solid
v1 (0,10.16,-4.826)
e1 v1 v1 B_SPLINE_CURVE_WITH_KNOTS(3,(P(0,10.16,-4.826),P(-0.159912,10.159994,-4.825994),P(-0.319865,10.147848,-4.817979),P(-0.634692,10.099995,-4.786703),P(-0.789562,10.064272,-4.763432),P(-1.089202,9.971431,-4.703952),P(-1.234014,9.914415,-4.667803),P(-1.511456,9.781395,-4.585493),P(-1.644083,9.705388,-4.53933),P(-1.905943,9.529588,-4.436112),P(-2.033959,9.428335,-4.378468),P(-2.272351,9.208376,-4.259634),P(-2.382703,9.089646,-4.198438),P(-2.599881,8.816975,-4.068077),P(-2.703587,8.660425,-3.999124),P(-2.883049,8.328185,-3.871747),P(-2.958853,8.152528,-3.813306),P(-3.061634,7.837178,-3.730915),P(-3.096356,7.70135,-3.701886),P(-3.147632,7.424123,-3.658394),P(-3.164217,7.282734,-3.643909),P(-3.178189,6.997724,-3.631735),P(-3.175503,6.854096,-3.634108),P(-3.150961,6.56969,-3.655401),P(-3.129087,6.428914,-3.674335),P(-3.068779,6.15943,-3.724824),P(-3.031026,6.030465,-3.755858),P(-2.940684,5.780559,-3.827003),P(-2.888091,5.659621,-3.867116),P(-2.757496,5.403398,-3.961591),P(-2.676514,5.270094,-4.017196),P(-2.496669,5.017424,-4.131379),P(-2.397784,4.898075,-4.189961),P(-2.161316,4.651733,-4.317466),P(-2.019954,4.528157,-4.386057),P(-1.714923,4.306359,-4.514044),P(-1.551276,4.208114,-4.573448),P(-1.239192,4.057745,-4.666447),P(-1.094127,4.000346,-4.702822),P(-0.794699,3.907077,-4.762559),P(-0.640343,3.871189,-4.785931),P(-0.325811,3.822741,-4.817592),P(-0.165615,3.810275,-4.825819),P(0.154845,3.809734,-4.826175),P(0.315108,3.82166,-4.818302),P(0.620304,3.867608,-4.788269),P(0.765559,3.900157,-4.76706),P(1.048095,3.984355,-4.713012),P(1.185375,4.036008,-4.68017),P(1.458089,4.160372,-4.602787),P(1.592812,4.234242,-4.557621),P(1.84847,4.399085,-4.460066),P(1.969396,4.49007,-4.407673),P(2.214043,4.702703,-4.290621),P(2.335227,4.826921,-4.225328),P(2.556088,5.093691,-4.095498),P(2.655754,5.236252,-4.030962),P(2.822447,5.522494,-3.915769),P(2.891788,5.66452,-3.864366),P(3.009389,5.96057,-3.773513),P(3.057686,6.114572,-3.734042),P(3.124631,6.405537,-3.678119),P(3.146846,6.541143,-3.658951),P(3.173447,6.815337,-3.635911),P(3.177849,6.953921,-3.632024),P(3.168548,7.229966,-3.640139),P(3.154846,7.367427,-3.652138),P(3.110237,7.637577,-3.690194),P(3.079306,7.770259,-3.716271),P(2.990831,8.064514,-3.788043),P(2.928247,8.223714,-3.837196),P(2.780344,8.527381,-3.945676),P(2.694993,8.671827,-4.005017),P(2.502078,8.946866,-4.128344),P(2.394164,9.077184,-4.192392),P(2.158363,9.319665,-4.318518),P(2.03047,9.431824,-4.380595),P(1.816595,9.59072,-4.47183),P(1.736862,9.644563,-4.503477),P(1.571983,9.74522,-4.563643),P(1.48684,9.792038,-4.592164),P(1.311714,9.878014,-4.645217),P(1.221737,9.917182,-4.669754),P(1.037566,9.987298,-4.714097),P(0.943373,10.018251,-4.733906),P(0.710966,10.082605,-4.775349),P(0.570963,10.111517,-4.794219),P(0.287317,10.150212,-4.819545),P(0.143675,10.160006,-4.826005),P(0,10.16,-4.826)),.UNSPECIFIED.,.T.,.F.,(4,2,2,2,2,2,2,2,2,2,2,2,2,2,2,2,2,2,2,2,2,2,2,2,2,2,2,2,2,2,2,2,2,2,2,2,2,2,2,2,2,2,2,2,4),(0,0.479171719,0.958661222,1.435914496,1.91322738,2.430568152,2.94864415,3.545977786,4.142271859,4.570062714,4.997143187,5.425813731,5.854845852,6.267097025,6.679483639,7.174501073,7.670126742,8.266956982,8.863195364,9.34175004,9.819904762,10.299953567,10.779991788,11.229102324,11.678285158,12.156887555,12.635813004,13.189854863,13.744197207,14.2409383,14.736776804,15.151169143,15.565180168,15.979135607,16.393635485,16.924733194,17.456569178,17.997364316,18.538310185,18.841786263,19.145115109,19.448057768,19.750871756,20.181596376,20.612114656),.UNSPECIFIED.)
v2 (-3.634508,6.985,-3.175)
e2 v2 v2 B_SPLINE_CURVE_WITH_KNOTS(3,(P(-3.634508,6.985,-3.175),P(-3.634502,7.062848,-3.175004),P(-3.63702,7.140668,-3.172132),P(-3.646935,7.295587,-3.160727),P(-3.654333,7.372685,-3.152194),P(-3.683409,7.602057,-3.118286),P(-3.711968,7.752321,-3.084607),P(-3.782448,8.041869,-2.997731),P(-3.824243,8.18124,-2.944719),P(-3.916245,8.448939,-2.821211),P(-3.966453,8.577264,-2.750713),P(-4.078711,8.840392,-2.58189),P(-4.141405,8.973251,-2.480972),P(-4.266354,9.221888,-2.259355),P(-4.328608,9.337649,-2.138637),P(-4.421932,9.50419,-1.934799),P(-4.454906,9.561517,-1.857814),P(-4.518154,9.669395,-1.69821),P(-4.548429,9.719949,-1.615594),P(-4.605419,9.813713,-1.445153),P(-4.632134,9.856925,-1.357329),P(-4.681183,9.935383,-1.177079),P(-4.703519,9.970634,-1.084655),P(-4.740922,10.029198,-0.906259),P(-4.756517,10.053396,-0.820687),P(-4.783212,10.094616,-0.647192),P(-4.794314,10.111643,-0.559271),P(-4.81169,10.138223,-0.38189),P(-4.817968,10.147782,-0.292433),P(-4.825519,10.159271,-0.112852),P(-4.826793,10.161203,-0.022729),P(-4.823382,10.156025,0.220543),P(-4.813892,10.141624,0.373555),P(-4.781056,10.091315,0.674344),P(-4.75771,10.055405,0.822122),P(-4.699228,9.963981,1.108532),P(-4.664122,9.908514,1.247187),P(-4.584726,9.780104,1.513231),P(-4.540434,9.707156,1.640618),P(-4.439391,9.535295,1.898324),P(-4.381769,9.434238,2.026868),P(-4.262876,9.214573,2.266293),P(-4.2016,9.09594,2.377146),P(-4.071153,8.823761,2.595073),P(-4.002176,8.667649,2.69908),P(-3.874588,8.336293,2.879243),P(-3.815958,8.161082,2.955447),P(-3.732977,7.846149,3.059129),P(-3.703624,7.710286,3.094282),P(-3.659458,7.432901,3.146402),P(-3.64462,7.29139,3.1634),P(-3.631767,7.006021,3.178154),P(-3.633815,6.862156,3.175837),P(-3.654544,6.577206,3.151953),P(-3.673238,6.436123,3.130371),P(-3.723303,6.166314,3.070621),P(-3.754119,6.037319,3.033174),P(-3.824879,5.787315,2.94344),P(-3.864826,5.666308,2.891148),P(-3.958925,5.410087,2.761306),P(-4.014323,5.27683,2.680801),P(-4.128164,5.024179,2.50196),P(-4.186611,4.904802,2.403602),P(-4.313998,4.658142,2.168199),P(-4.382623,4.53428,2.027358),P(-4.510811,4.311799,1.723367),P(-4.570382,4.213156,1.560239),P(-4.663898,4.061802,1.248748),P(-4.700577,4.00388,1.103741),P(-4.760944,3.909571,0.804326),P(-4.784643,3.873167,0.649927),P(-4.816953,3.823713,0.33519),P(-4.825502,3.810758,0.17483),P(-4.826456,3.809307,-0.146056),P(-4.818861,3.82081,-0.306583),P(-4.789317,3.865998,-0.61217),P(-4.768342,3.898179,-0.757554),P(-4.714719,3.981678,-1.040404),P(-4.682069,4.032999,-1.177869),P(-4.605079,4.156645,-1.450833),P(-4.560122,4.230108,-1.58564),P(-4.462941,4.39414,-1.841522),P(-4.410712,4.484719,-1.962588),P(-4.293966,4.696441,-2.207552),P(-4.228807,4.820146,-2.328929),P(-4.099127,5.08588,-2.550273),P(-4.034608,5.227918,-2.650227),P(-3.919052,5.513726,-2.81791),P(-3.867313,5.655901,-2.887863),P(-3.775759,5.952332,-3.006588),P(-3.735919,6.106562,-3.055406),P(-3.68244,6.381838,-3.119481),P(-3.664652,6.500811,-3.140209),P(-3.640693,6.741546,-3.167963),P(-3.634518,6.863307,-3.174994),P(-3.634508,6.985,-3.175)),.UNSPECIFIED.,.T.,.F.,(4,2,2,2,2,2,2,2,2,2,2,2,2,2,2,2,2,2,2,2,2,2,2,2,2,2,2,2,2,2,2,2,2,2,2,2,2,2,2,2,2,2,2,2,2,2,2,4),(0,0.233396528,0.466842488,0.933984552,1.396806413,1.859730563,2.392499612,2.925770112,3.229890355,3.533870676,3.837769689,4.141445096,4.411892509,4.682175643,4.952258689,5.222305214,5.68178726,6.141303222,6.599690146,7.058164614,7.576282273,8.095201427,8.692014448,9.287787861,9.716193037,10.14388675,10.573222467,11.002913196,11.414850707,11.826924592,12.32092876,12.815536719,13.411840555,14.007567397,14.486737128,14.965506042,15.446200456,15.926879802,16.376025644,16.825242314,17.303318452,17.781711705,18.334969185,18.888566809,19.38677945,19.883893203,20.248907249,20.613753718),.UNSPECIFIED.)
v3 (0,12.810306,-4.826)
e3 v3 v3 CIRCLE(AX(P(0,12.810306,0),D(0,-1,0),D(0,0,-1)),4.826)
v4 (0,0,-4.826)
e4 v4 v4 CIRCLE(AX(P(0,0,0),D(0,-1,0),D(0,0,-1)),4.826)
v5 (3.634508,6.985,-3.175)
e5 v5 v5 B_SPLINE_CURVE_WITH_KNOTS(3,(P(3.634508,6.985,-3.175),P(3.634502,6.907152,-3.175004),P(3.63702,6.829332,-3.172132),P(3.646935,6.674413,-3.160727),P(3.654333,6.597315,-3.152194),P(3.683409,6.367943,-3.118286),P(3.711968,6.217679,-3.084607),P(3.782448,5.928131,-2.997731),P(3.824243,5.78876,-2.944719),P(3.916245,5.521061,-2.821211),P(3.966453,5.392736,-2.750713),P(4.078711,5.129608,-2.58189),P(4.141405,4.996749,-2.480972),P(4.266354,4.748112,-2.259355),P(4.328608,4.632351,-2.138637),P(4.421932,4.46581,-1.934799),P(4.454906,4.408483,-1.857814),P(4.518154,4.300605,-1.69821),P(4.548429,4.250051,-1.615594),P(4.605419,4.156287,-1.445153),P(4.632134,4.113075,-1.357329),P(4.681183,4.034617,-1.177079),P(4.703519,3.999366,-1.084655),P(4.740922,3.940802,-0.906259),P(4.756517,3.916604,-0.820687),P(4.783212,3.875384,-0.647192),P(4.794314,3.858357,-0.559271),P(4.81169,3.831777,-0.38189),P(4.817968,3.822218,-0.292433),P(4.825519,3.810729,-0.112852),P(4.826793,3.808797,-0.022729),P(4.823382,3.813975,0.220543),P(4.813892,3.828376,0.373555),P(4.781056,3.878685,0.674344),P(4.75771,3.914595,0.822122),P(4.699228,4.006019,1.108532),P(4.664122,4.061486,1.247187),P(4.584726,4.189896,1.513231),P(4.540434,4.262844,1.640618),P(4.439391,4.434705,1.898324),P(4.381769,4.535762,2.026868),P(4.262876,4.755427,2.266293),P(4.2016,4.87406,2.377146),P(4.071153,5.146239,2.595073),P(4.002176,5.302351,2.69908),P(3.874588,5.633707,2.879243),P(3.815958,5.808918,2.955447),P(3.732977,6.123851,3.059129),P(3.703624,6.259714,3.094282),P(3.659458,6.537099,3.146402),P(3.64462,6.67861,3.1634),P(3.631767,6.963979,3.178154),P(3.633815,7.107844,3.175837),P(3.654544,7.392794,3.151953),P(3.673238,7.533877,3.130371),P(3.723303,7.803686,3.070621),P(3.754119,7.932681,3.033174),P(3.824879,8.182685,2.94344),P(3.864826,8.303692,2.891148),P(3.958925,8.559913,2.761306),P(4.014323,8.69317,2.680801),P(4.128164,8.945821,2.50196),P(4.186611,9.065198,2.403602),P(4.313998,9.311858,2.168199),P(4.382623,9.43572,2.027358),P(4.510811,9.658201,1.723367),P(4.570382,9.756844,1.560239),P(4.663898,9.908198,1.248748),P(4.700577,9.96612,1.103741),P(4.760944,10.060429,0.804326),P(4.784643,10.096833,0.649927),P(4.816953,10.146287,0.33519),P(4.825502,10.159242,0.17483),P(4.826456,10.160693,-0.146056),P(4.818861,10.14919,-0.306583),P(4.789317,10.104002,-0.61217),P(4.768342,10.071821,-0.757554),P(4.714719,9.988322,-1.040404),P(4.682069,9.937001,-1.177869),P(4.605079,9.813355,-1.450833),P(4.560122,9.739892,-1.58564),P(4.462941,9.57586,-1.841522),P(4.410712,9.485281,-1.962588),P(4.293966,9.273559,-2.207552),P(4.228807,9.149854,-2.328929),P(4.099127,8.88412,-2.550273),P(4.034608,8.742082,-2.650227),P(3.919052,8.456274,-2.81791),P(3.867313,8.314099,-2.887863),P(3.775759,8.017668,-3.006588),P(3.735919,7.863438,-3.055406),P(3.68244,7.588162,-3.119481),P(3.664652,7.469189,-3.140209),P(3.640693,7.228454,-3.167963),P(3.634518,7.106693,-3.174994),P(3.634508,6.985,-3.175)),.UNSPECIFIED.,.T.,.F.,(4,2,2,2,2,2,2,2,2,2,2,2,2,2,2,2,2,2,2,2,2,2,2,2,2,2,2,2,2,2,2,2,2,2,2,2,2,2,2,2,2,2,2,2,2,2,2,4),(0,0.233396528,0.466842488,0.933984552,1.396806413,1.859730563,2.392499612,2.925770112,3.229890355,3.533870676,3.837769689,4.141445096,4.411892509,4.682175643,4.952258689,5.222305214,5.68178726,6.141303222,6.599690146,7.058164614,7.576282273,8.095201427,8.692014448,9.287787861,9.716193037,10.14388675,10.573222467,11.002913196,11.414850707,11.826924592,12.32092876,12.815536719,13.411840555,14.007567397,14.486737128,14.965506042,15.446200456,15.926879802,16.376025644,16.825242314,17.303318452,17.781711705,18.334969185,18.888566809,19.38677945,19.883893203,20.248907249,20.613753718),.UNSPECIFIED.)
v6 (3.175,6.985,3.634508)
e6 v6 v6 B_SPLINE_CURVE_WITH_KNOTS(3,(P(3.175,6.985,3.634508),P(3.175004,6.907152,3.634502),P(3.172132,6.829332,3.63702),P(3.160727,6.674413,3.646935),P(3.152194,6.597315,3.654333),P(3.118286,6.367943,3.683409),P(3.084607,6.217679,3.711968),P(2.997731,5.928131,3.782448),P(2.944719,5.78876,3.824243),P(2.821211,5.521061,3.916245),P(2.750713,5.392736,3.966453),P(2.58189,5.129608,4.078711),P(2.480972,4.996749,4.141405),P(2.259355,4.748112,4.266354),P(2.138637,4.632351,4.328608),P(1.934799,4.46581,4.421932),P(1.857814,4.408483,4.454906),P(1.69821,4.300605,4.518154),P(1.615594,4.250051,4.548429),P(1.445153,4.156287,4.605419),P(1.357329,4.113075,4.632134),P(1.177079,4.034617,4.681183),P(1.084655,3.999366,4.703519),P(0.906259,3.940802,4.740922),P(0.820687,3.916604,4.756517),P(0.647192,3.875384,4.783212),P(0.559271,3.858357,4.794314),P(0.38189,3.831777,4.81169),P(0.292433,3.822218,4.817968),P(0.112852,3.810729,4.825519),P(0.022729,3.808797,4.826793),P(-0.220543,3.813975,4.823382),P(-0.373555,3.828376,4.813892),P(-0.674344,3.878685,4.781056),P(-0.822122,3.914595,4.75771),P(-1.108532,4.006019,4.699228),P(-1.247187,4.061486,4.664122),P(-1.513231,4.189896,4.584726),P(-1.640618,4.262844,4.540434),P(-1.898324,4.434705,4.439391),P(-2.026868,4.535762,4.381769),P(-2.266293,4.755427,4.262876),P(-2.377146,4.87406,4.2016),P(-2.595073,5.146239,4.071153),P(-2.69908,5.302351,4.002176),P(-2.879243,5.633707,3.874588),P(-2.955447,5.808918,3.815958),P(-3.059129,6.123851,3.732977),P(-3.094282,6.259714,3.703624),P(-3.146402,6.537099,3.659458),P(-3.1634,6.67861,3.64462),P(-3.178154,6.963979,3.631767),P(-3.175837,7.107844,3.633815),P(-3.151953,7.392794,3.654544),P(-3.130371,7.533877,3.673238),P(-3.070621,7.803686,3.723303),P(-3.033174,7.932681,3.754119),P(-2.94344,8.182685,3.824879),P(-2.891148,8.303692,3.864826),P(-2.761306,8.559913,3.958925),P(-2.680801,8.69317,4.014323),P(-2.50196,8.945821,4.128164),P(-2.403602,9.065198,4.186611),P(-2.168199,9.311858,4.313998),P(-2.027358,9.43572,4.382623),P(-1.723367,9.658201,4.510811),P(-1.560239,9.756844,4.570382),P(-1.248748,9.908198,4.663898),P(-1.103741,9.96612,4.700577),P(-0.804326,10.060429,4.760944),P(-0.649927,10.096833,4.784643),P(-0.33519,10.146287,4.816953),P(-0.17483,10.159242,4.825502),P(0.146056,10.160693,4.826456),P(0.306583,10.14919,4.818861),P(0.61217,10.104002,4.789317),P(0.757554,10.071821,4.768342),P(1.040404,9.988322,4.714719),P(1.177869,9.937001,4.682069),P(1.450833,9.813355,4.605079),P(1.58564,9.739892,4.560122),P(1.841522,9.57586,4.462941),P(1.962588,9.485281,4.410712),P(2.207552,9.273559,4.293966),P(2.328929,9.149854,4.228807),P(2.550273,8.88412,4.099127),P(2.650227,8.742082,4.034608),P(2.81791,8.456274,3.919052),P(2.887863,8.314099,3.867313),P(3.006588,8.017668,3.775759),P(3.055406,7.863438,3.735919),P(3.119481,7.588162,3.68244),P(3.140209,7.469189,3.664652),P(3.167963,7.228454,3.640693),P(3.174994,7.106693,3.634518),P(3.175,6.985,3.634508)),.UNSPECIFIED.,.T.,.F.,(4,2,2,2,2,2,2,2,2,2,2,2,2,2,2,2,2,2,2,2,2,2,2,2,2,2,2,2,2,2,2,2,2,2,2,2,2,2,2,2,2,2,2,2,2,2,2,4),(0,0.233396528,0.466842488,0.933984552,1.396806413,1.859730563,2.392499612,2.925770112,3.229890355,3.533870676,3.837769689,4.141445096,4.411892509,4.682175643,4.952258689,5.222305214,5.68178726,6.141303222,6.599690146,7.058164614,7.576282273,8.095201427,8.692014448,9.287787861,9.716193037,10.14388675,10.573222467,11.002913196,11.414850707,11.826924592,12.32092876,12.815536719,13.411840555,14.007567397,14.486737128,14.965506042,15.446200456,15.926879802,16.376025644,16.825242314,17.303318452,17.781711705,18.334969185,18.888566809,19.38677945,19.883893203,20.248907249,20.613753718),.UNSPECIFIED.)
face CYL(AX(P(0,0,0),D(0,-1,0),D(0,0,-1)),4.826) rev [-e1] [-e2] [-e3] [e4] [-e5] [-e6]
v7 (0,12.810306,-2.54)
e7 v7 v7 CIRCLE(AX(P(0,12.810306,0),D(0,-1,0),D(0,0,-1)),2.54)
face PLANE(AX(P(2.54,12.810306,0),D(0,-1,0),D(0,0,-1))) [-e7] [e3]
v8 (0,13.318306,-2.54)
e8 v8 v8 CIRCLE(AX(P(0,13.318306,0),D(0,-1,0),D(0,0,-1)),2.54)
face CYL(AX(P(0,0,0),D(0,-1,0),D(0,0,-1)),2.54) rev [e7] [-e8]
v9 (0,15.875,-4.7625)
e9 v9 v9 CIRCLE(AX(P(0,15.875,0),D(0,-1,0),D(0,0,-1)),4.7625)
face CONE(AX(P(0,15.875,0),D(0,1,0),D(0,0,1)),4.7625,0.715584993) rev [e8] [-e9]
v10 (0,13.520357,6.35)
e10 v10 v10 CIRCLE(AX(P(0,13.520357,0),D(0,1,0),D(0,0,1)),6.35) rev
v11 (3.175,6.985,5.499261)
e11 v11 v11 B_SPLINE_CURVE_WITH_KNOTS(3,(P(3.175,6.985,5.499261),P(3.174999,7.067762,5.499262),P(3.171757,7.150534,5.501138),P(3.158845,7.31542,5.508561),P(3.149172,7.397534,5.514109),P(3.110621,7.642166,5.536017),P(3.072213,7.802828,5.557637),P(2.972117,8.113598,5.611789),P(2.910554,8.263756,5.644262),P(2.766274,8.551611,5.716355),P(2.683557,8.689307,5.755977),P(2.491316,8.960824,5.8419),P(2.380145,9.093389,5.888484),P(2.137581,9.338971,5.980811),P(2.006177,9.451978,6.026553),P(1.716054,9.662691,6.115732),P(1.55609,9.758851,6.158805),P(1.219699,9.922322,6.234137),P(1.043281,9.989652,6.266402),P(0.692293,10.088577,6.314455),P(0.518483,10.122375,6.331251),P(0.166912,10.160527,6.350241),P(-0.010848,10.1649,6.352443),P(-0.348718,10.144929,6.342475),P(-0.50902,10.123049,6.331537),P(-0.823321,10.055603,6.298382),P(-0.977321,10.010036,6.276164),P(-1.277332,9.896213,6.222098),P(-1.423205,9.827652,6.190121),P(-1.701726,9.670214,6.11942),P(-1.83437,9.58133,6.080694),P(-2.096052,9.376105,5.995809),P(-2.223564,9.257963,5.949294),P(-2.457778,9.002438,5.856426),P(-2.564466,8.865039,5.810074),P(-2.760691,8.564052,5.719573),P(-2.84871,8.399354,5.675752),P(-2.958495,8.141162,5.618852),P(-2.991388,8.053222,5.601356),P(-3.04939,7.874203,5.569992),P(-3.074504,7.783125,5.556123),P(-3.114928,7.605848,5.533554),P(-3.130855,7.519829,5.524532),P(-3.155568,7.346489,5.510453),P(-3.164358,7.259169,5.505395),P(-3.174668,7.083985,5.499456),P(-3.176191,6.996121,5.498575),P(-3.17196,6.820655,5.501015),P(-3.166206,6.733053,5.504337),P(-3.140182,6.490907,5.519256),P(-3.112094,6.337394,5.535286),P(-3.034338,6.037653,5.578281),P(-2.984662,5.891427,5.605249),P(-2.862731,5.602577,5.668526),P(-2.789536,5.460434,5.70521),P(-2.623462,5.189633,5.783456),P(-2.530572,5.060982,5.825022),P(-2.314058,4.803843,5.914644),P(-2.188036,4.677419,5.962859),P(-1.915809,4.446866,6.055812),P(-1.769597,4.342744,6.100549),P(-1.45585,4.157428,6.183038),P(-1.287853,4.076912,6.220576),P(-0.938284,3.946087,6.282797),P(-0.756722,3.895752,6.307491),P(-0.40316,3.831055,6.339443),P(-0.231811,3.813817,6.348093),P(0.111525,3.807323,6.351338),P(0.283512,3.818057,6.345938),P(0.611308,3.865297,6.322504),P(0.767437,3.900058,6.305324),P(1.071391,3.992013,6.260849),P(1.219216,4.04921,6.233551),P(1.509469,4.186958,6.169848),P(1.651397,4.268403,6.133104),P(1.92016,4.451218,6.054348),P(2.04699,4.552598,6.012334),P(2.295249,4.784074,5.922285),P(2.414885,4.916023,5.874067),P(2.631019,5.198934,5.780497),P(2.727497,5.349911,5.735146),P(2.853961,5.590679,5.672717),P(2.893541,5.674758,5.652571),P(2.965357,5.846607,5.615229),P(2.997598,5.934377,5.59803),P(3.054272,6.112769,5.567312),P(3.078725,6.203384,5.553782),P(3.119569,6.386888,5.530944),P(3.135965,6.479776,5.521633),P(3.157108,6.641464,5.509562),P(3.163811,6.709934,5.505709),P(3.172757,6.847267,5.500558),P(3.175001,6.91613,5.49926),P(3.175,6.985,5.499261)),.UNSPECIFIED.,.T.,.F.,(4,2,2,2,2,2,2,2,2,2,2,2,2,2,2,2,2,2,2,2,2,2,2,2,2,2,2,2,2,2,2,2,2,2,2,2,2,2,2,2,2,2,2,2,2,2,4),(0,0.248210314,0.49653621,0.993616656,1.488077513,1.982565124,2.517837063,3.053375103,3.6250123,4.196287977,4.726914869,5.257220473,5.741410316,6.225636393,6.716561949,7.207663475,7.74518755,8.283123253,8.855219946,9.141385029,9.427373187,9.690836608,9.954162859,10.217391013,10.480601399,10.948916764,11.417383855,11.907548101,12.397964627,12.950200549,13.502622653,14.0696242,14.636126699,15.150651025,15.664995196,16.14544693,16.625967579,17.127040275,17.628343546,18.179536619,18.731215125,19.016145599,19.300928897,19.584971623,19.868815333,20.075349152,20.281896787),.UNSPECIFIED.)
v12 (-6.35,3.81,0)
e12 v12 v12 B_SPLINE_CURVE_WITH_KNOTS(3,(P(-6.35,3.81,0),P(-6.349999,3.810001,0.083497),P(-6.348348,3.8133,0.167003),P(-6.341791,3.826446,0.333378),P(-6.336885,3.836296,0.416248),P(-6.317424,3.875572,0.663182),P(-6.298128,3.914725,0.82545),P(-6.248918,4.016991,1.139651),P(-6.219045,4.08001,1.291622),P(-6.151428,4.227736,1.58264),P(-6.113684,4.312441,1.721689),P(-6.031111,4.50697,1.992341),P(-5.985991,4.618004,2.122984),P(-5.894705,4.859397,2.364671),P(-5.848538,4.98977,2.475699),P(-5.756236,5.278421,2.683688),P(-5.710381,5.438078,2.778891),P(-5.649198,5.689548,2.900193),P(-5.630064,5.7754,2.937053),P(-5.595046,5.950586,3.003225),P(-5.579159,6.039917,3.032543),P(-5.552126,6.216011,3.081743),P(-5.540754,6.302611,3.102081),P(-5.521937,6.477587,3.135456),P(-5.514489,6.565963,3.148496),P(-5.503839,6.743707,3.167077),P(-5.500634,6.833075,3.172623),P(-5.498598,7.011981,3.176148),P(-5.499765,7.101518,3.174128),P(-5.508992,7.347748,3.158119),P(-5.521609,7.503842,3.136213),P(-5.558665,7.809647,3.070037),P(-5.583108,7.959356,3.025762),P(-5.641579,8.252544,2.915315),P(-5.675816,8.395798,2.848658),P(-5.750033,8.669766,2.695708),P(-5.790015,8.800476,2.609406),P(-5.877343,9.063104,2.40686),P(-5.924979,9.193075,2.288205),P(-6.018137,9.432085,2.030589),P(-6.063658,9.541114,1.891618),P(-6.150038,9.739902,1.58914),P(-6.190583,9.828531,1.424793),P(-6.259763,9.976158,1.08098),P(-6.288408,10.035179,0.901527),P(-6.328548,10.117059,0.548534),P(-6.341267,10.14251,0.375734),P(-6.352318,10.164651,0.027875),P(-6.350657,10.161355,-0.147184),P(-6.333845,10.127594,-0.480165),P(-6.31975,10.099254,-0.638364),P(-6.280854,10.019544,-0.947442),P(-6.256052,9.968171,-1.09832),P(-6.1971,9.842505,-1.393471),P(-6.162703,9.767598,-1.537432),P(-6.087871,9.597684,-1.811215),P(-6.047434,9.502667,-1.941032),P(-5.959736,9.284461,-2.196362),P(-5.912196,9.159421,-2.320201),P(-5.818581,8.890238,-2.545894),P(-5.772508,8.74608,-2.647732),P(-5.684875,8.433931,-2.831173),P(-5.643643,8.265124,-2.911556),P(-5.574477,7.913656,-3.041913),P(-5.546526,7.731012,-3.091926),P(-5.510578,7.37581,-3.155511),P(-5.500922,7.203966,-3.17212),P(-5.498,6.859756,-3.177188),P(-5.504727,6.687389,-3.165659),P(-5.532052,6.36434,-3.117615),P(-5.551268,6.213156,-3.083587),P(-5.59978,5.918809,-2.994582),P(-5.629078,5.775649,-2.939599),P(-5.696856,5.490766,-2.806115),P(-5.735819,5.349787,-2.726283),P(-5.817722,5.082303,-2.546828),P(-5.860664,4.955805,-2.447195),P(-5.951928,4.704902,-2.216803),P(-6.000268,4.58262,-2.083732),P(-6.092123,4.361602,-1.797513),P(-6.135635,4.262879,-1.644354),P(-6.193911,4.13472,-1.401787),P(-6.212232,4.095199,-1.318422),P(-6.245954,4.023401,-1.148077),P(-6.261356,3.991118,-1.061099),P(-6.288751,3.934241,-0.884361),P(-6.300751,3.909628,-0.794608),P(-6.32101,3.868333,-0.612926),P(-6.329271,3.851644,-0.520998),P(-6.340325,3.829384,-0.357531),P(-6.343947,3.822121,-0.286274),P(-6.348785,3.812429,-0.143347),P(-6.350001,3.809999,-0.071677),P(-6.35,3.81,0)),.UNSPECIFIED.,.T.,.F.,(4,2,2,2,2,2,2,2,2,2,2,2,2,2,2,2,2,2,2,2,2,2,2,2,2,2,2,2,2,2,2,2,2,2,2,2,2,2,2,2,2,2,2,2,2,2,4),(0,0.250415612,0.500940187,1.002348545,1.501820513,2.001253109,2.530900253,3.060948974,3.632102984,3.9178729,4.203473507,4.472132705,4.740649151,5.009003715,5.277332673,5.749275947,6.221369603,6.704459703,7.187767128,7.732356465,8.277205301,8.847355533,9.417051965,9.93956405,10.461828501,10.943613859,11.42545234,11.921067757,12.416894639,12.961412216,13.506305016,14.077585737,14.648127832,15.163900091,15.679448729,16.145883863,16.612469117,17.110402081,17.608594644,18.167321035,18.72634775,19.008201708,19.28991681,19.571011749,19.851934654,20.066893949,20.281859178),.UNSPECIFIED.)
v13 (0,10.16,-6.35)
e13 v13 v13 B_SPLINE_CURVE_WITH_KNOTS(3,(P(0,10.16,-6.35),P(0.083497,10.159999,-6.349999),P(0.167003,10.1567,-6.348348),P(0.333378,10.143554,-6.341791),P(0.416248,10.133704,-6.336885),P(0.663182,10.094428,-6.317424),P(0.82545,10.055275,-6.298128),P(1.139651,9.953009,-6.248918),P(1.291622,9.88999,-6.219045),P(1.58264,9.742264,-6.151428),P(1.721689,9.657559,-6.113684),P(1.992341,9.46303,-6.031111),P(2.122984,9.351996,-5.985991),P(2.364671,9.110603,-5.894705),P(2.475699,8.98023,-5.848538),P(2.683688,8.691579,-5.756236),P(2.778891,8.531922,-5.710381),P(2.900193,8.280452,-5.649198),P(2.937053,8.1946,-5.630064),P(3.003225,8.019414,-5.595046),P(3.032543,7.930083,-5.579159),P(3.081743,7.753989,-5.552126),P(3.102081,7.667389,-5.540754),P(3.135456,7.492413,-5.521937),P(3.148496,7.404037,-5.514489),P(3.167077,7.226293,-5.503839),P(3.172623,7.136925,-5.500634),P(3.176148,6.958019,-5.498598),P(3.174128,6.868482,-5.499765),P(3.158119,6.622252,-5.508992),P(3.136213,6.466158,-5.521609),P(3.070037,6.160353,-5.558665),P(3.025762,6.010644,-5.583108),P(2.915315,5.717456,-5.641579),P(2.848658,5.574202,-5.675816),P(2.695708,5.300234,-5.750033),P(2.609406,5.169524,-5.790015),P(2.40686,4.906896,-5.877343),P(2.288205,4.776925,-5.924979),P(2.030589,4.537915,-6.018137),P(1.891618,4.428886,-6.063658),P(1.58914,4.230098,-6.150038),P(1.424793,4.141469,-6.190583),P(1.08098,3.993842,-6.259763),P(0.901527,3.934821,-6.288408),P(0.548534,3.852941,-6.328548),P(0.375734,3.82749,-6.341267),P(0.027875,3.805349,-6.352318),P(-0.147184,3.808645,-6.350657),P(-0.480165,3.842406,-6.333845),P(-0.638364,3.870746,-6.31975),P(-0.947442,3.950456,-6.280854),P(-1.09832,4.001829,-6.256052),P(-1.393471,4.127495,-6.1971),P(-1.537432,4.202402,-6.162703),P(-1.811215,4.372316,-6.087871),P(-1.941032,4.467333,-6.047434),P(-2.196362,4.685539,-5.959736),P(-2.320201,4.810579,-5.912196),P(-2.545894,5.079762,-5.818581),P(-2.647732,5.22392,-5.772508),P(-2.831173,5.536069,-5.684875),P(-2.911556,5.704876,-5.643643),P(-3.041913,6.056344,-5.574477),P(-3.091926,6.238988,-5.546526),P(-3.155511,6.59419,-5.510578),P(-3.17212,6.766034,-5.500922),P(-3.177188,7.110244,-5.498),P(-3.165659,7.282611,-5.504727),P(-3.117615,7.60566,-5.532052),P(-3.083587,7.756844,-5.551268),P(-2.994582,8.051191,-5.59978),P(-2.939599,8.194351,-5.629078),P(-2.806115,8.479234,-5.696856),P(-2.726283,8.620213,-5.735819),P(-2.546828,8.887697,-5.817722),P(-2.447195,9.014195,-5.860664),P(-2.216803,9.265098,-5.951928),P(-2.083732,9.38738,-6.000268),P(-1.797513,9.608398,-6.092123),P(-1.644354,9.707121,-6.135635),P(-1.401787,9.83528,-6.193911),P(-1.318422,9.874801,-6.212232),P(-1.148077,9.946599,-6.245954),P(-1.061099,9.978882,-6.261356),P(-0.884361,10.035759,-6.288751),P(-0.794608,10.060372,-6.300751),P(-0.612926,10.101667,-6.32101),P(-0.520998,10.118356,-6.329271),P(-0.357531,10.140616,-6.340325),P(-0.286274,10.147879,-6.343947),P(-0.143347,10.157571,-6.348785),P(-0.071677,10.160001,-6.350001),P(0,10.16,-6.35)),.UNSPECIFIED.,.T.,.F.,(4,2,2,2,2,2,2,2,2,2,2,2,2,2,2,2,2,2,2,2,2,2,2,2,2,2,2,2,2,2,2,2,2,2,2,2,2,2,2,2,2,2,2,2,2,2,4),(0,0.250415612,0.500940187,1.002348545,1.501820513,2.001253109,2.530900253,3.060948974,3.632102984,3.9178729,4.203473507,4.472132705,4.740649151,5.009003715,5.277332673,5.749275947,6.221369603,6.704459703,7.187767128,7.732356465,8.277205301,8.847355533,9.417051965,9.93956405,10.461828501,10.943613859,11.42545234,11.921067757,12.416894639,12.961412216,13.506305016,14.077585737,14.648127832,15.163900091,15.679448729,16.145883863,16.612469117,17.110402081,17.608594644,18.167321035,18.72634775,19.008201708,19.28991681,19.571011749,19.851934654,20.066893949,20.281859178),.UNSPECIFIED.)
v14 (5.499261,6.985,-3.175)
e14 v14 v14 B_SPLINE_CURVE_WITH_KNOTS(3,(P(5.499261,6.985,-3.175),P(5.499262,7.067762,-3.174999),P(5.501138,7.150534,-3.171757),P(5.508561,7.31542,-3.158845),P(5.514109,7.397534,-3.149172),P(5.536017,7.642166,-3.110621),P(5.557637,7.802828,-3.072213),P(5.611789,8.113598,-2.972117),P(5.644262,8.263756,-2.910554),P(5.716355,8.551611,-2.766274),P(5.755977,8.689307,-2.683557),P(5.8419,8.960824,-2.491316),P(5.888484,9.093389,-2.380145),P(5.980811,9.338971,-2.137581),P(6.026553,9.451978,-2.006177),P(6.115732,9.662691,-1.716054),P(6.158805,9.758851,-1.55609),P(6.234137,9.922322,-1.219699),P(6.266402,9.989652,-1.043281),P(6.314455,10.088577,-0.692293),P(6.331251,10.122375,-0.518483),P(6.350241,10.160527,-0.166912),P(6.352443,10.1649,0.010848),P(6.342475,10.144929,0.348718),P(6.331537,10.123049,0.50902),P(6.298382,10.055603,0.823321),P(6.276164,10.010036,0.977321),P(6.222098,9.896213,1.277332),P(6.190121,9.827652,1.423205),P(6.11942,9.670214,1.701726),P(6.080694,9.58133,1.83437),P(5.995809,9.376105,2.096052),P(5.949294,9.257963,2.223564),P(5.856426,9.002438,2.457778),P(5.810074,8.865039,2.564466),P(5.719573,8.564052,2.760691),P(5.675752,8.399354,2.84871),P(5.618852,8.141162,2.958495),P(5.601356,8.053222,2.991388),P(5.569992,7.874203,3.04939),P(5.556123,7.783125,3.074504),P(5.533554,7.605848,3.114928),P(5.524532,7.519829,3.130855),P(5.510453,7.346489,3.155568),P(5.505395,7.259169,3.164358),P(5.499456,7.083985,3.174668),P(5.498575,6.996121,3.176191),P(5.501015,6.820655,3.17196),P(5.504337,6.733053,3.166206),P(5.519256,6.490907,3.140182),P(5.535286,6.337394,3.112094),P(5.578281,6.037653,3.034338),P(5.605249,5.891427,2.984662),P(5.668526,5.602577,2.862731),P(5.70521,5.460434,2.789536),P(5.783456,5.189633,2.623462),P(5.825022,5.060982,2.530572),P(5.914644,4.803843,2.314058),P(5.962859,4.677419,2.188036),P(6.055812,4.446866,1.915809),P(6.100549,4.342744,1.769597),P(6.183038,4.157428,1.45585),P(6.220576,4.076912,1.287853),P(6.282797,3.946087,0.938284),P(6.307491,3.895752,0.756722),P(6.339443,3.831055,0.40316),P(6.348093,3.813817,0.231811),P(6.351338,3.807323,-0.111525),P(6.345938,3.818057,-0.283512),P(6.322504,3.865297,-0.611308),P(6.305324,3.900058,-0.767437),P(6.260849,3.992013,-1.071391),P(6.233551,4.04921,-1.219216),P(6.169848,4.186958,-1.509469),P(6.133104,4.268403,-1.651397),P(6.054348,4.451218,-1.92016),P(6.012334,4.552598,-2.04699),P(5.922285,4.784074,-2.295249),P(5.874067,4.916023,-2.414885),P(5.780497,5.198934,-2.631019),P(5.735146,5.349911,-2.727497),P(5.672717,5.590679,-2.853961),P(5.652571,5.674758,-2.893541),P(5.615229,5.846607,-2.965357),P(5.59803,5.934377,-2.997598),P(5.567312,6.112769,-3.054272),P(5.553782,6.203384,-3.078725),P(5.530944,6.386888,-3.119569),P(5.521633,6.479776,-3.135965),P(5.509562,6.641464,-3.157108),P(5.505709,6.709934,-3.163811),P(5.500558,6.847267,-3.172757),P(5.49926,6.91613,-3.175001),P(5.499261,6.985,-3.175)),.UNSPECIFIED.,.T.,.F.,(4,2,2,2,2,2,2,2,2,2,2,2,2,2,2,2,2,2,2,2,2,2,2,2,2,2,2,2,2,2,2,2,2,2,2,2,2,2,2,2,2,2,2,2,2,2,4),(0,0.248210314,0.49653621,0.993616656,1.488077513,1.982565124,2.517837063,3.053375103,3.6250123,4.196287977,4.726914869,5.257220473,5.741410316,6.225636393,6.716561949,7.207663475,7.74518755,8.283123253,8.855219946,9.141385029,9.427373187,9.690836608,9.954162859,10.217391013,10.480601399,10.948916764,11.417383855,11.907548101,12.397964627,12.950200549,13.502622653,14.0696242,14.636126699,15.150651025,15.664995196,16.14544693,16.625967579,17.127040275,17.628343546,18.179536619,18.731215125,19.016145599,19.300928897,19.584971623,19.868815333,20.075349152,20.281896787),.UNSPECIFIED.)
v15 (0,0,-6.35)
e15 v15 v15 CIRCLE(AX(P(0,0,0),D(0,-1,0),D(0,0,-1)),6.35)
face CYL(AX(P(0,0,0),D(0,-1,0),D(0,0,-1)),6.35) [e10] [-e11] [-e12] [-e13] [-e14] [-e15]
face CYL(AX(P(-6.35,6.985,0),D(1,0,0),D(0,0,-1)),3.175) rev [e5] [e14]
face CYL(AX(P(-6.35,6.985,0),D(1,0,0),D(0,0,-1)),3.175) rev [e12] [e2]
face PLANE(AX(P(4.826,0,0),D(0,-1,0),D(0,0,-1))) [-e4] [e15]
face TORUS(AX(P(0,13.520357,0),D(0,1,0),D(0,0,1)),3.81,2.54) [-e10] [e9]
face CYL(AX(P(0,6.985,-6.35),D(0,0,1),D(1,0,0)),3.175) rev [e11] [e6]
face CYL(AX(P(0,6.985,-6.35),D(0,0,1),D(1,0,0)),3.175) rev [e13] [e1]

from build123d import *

# Parameters (mm, degrees)
FILLET1_R          = 2.54
SKETCH2_R          = 3.175
CUT_EXTRUDE1_DEPTH = 19.238986472
CIRPATTERN1_COUNT  = 4


with BuildPart() as part:
    # Sketch1 → Revolve1 (revolve)
    with BuildSketch(Plane.XY, mode=Mode.PRIVATE) as revolve1_sk:
        Polygon((6.35, 0), (6.35, 15.875), (4.7625, 15.875), (2.54, 13.318306215), (2.54, 12.810306215), (4.826, 12.810306215), (4.826, 0), align=None)
    revolve(revolve1_sk.sketch.rotate(Axis((0, 0, 0), (0, 1, 0)), 90), axis=Axis((0, 0, 0), (0, 1, 0)))

    # Fillet1
    # the kernel refuses this fillet: 2.54 mm, written as the material it takes off along each edge
    with BuildSketch(Plane(origin=(0, 15.875, 0), x_dir=(0, 0, -1), z_dir=(1, 0, 0))) as fillet1_piece_1:
        with BuildLine():
            CenterArc((3.81, -2.35464302), FILLET1_R, 0, 67.975687163)
            Line((4.7625, 0), (4.78155, 0.04709286))
            ThreePointArc((4.78155, 0.04709286), (5.55625, 0.0508), (6.35, 0.0508))
            Line((6.35, 0.0508), (6.4008, 0))
            Line((6.4008, 0), (6.4008, -2.35464302))
            Line((6.4008, -2.35464302), (6.35, -2.35464302))
        make_face()
    revolve(axis=Axis((0, 15.875, 0), (0, 1, 0)), mode=Mode.SUBTRACT)

    # Sketch2 → Cut-Extrude1 (cut, symmetric)
    with BuildSketch(Plane(origin=(0, 0, 0), x_dir=(0, 0, -1), z_dir=(1, 0, 0))):
        with Locations((0, 6.985)):
            Circle(SKETCH2_R)
    cut_extrude1 = extrude(amount=CUT_EXTRUDE1_DEPTH, both=True, mode=Mode.SUBTRACT)

    # CirPattern1: Cut-Extrude1 ×4 about axis
    cirpattern1_axis = Axis((0, 12.810306215, 0), (0, -1, 0))
    for i in range(1, CIRPATTERN1_COUNT):
        add(cut_extrude1.rotate(cirpattern1_axis, i * 360 / CIRPATTERN1_COUNT), mode=Mode.SUBTRACT)


solid = part.part
